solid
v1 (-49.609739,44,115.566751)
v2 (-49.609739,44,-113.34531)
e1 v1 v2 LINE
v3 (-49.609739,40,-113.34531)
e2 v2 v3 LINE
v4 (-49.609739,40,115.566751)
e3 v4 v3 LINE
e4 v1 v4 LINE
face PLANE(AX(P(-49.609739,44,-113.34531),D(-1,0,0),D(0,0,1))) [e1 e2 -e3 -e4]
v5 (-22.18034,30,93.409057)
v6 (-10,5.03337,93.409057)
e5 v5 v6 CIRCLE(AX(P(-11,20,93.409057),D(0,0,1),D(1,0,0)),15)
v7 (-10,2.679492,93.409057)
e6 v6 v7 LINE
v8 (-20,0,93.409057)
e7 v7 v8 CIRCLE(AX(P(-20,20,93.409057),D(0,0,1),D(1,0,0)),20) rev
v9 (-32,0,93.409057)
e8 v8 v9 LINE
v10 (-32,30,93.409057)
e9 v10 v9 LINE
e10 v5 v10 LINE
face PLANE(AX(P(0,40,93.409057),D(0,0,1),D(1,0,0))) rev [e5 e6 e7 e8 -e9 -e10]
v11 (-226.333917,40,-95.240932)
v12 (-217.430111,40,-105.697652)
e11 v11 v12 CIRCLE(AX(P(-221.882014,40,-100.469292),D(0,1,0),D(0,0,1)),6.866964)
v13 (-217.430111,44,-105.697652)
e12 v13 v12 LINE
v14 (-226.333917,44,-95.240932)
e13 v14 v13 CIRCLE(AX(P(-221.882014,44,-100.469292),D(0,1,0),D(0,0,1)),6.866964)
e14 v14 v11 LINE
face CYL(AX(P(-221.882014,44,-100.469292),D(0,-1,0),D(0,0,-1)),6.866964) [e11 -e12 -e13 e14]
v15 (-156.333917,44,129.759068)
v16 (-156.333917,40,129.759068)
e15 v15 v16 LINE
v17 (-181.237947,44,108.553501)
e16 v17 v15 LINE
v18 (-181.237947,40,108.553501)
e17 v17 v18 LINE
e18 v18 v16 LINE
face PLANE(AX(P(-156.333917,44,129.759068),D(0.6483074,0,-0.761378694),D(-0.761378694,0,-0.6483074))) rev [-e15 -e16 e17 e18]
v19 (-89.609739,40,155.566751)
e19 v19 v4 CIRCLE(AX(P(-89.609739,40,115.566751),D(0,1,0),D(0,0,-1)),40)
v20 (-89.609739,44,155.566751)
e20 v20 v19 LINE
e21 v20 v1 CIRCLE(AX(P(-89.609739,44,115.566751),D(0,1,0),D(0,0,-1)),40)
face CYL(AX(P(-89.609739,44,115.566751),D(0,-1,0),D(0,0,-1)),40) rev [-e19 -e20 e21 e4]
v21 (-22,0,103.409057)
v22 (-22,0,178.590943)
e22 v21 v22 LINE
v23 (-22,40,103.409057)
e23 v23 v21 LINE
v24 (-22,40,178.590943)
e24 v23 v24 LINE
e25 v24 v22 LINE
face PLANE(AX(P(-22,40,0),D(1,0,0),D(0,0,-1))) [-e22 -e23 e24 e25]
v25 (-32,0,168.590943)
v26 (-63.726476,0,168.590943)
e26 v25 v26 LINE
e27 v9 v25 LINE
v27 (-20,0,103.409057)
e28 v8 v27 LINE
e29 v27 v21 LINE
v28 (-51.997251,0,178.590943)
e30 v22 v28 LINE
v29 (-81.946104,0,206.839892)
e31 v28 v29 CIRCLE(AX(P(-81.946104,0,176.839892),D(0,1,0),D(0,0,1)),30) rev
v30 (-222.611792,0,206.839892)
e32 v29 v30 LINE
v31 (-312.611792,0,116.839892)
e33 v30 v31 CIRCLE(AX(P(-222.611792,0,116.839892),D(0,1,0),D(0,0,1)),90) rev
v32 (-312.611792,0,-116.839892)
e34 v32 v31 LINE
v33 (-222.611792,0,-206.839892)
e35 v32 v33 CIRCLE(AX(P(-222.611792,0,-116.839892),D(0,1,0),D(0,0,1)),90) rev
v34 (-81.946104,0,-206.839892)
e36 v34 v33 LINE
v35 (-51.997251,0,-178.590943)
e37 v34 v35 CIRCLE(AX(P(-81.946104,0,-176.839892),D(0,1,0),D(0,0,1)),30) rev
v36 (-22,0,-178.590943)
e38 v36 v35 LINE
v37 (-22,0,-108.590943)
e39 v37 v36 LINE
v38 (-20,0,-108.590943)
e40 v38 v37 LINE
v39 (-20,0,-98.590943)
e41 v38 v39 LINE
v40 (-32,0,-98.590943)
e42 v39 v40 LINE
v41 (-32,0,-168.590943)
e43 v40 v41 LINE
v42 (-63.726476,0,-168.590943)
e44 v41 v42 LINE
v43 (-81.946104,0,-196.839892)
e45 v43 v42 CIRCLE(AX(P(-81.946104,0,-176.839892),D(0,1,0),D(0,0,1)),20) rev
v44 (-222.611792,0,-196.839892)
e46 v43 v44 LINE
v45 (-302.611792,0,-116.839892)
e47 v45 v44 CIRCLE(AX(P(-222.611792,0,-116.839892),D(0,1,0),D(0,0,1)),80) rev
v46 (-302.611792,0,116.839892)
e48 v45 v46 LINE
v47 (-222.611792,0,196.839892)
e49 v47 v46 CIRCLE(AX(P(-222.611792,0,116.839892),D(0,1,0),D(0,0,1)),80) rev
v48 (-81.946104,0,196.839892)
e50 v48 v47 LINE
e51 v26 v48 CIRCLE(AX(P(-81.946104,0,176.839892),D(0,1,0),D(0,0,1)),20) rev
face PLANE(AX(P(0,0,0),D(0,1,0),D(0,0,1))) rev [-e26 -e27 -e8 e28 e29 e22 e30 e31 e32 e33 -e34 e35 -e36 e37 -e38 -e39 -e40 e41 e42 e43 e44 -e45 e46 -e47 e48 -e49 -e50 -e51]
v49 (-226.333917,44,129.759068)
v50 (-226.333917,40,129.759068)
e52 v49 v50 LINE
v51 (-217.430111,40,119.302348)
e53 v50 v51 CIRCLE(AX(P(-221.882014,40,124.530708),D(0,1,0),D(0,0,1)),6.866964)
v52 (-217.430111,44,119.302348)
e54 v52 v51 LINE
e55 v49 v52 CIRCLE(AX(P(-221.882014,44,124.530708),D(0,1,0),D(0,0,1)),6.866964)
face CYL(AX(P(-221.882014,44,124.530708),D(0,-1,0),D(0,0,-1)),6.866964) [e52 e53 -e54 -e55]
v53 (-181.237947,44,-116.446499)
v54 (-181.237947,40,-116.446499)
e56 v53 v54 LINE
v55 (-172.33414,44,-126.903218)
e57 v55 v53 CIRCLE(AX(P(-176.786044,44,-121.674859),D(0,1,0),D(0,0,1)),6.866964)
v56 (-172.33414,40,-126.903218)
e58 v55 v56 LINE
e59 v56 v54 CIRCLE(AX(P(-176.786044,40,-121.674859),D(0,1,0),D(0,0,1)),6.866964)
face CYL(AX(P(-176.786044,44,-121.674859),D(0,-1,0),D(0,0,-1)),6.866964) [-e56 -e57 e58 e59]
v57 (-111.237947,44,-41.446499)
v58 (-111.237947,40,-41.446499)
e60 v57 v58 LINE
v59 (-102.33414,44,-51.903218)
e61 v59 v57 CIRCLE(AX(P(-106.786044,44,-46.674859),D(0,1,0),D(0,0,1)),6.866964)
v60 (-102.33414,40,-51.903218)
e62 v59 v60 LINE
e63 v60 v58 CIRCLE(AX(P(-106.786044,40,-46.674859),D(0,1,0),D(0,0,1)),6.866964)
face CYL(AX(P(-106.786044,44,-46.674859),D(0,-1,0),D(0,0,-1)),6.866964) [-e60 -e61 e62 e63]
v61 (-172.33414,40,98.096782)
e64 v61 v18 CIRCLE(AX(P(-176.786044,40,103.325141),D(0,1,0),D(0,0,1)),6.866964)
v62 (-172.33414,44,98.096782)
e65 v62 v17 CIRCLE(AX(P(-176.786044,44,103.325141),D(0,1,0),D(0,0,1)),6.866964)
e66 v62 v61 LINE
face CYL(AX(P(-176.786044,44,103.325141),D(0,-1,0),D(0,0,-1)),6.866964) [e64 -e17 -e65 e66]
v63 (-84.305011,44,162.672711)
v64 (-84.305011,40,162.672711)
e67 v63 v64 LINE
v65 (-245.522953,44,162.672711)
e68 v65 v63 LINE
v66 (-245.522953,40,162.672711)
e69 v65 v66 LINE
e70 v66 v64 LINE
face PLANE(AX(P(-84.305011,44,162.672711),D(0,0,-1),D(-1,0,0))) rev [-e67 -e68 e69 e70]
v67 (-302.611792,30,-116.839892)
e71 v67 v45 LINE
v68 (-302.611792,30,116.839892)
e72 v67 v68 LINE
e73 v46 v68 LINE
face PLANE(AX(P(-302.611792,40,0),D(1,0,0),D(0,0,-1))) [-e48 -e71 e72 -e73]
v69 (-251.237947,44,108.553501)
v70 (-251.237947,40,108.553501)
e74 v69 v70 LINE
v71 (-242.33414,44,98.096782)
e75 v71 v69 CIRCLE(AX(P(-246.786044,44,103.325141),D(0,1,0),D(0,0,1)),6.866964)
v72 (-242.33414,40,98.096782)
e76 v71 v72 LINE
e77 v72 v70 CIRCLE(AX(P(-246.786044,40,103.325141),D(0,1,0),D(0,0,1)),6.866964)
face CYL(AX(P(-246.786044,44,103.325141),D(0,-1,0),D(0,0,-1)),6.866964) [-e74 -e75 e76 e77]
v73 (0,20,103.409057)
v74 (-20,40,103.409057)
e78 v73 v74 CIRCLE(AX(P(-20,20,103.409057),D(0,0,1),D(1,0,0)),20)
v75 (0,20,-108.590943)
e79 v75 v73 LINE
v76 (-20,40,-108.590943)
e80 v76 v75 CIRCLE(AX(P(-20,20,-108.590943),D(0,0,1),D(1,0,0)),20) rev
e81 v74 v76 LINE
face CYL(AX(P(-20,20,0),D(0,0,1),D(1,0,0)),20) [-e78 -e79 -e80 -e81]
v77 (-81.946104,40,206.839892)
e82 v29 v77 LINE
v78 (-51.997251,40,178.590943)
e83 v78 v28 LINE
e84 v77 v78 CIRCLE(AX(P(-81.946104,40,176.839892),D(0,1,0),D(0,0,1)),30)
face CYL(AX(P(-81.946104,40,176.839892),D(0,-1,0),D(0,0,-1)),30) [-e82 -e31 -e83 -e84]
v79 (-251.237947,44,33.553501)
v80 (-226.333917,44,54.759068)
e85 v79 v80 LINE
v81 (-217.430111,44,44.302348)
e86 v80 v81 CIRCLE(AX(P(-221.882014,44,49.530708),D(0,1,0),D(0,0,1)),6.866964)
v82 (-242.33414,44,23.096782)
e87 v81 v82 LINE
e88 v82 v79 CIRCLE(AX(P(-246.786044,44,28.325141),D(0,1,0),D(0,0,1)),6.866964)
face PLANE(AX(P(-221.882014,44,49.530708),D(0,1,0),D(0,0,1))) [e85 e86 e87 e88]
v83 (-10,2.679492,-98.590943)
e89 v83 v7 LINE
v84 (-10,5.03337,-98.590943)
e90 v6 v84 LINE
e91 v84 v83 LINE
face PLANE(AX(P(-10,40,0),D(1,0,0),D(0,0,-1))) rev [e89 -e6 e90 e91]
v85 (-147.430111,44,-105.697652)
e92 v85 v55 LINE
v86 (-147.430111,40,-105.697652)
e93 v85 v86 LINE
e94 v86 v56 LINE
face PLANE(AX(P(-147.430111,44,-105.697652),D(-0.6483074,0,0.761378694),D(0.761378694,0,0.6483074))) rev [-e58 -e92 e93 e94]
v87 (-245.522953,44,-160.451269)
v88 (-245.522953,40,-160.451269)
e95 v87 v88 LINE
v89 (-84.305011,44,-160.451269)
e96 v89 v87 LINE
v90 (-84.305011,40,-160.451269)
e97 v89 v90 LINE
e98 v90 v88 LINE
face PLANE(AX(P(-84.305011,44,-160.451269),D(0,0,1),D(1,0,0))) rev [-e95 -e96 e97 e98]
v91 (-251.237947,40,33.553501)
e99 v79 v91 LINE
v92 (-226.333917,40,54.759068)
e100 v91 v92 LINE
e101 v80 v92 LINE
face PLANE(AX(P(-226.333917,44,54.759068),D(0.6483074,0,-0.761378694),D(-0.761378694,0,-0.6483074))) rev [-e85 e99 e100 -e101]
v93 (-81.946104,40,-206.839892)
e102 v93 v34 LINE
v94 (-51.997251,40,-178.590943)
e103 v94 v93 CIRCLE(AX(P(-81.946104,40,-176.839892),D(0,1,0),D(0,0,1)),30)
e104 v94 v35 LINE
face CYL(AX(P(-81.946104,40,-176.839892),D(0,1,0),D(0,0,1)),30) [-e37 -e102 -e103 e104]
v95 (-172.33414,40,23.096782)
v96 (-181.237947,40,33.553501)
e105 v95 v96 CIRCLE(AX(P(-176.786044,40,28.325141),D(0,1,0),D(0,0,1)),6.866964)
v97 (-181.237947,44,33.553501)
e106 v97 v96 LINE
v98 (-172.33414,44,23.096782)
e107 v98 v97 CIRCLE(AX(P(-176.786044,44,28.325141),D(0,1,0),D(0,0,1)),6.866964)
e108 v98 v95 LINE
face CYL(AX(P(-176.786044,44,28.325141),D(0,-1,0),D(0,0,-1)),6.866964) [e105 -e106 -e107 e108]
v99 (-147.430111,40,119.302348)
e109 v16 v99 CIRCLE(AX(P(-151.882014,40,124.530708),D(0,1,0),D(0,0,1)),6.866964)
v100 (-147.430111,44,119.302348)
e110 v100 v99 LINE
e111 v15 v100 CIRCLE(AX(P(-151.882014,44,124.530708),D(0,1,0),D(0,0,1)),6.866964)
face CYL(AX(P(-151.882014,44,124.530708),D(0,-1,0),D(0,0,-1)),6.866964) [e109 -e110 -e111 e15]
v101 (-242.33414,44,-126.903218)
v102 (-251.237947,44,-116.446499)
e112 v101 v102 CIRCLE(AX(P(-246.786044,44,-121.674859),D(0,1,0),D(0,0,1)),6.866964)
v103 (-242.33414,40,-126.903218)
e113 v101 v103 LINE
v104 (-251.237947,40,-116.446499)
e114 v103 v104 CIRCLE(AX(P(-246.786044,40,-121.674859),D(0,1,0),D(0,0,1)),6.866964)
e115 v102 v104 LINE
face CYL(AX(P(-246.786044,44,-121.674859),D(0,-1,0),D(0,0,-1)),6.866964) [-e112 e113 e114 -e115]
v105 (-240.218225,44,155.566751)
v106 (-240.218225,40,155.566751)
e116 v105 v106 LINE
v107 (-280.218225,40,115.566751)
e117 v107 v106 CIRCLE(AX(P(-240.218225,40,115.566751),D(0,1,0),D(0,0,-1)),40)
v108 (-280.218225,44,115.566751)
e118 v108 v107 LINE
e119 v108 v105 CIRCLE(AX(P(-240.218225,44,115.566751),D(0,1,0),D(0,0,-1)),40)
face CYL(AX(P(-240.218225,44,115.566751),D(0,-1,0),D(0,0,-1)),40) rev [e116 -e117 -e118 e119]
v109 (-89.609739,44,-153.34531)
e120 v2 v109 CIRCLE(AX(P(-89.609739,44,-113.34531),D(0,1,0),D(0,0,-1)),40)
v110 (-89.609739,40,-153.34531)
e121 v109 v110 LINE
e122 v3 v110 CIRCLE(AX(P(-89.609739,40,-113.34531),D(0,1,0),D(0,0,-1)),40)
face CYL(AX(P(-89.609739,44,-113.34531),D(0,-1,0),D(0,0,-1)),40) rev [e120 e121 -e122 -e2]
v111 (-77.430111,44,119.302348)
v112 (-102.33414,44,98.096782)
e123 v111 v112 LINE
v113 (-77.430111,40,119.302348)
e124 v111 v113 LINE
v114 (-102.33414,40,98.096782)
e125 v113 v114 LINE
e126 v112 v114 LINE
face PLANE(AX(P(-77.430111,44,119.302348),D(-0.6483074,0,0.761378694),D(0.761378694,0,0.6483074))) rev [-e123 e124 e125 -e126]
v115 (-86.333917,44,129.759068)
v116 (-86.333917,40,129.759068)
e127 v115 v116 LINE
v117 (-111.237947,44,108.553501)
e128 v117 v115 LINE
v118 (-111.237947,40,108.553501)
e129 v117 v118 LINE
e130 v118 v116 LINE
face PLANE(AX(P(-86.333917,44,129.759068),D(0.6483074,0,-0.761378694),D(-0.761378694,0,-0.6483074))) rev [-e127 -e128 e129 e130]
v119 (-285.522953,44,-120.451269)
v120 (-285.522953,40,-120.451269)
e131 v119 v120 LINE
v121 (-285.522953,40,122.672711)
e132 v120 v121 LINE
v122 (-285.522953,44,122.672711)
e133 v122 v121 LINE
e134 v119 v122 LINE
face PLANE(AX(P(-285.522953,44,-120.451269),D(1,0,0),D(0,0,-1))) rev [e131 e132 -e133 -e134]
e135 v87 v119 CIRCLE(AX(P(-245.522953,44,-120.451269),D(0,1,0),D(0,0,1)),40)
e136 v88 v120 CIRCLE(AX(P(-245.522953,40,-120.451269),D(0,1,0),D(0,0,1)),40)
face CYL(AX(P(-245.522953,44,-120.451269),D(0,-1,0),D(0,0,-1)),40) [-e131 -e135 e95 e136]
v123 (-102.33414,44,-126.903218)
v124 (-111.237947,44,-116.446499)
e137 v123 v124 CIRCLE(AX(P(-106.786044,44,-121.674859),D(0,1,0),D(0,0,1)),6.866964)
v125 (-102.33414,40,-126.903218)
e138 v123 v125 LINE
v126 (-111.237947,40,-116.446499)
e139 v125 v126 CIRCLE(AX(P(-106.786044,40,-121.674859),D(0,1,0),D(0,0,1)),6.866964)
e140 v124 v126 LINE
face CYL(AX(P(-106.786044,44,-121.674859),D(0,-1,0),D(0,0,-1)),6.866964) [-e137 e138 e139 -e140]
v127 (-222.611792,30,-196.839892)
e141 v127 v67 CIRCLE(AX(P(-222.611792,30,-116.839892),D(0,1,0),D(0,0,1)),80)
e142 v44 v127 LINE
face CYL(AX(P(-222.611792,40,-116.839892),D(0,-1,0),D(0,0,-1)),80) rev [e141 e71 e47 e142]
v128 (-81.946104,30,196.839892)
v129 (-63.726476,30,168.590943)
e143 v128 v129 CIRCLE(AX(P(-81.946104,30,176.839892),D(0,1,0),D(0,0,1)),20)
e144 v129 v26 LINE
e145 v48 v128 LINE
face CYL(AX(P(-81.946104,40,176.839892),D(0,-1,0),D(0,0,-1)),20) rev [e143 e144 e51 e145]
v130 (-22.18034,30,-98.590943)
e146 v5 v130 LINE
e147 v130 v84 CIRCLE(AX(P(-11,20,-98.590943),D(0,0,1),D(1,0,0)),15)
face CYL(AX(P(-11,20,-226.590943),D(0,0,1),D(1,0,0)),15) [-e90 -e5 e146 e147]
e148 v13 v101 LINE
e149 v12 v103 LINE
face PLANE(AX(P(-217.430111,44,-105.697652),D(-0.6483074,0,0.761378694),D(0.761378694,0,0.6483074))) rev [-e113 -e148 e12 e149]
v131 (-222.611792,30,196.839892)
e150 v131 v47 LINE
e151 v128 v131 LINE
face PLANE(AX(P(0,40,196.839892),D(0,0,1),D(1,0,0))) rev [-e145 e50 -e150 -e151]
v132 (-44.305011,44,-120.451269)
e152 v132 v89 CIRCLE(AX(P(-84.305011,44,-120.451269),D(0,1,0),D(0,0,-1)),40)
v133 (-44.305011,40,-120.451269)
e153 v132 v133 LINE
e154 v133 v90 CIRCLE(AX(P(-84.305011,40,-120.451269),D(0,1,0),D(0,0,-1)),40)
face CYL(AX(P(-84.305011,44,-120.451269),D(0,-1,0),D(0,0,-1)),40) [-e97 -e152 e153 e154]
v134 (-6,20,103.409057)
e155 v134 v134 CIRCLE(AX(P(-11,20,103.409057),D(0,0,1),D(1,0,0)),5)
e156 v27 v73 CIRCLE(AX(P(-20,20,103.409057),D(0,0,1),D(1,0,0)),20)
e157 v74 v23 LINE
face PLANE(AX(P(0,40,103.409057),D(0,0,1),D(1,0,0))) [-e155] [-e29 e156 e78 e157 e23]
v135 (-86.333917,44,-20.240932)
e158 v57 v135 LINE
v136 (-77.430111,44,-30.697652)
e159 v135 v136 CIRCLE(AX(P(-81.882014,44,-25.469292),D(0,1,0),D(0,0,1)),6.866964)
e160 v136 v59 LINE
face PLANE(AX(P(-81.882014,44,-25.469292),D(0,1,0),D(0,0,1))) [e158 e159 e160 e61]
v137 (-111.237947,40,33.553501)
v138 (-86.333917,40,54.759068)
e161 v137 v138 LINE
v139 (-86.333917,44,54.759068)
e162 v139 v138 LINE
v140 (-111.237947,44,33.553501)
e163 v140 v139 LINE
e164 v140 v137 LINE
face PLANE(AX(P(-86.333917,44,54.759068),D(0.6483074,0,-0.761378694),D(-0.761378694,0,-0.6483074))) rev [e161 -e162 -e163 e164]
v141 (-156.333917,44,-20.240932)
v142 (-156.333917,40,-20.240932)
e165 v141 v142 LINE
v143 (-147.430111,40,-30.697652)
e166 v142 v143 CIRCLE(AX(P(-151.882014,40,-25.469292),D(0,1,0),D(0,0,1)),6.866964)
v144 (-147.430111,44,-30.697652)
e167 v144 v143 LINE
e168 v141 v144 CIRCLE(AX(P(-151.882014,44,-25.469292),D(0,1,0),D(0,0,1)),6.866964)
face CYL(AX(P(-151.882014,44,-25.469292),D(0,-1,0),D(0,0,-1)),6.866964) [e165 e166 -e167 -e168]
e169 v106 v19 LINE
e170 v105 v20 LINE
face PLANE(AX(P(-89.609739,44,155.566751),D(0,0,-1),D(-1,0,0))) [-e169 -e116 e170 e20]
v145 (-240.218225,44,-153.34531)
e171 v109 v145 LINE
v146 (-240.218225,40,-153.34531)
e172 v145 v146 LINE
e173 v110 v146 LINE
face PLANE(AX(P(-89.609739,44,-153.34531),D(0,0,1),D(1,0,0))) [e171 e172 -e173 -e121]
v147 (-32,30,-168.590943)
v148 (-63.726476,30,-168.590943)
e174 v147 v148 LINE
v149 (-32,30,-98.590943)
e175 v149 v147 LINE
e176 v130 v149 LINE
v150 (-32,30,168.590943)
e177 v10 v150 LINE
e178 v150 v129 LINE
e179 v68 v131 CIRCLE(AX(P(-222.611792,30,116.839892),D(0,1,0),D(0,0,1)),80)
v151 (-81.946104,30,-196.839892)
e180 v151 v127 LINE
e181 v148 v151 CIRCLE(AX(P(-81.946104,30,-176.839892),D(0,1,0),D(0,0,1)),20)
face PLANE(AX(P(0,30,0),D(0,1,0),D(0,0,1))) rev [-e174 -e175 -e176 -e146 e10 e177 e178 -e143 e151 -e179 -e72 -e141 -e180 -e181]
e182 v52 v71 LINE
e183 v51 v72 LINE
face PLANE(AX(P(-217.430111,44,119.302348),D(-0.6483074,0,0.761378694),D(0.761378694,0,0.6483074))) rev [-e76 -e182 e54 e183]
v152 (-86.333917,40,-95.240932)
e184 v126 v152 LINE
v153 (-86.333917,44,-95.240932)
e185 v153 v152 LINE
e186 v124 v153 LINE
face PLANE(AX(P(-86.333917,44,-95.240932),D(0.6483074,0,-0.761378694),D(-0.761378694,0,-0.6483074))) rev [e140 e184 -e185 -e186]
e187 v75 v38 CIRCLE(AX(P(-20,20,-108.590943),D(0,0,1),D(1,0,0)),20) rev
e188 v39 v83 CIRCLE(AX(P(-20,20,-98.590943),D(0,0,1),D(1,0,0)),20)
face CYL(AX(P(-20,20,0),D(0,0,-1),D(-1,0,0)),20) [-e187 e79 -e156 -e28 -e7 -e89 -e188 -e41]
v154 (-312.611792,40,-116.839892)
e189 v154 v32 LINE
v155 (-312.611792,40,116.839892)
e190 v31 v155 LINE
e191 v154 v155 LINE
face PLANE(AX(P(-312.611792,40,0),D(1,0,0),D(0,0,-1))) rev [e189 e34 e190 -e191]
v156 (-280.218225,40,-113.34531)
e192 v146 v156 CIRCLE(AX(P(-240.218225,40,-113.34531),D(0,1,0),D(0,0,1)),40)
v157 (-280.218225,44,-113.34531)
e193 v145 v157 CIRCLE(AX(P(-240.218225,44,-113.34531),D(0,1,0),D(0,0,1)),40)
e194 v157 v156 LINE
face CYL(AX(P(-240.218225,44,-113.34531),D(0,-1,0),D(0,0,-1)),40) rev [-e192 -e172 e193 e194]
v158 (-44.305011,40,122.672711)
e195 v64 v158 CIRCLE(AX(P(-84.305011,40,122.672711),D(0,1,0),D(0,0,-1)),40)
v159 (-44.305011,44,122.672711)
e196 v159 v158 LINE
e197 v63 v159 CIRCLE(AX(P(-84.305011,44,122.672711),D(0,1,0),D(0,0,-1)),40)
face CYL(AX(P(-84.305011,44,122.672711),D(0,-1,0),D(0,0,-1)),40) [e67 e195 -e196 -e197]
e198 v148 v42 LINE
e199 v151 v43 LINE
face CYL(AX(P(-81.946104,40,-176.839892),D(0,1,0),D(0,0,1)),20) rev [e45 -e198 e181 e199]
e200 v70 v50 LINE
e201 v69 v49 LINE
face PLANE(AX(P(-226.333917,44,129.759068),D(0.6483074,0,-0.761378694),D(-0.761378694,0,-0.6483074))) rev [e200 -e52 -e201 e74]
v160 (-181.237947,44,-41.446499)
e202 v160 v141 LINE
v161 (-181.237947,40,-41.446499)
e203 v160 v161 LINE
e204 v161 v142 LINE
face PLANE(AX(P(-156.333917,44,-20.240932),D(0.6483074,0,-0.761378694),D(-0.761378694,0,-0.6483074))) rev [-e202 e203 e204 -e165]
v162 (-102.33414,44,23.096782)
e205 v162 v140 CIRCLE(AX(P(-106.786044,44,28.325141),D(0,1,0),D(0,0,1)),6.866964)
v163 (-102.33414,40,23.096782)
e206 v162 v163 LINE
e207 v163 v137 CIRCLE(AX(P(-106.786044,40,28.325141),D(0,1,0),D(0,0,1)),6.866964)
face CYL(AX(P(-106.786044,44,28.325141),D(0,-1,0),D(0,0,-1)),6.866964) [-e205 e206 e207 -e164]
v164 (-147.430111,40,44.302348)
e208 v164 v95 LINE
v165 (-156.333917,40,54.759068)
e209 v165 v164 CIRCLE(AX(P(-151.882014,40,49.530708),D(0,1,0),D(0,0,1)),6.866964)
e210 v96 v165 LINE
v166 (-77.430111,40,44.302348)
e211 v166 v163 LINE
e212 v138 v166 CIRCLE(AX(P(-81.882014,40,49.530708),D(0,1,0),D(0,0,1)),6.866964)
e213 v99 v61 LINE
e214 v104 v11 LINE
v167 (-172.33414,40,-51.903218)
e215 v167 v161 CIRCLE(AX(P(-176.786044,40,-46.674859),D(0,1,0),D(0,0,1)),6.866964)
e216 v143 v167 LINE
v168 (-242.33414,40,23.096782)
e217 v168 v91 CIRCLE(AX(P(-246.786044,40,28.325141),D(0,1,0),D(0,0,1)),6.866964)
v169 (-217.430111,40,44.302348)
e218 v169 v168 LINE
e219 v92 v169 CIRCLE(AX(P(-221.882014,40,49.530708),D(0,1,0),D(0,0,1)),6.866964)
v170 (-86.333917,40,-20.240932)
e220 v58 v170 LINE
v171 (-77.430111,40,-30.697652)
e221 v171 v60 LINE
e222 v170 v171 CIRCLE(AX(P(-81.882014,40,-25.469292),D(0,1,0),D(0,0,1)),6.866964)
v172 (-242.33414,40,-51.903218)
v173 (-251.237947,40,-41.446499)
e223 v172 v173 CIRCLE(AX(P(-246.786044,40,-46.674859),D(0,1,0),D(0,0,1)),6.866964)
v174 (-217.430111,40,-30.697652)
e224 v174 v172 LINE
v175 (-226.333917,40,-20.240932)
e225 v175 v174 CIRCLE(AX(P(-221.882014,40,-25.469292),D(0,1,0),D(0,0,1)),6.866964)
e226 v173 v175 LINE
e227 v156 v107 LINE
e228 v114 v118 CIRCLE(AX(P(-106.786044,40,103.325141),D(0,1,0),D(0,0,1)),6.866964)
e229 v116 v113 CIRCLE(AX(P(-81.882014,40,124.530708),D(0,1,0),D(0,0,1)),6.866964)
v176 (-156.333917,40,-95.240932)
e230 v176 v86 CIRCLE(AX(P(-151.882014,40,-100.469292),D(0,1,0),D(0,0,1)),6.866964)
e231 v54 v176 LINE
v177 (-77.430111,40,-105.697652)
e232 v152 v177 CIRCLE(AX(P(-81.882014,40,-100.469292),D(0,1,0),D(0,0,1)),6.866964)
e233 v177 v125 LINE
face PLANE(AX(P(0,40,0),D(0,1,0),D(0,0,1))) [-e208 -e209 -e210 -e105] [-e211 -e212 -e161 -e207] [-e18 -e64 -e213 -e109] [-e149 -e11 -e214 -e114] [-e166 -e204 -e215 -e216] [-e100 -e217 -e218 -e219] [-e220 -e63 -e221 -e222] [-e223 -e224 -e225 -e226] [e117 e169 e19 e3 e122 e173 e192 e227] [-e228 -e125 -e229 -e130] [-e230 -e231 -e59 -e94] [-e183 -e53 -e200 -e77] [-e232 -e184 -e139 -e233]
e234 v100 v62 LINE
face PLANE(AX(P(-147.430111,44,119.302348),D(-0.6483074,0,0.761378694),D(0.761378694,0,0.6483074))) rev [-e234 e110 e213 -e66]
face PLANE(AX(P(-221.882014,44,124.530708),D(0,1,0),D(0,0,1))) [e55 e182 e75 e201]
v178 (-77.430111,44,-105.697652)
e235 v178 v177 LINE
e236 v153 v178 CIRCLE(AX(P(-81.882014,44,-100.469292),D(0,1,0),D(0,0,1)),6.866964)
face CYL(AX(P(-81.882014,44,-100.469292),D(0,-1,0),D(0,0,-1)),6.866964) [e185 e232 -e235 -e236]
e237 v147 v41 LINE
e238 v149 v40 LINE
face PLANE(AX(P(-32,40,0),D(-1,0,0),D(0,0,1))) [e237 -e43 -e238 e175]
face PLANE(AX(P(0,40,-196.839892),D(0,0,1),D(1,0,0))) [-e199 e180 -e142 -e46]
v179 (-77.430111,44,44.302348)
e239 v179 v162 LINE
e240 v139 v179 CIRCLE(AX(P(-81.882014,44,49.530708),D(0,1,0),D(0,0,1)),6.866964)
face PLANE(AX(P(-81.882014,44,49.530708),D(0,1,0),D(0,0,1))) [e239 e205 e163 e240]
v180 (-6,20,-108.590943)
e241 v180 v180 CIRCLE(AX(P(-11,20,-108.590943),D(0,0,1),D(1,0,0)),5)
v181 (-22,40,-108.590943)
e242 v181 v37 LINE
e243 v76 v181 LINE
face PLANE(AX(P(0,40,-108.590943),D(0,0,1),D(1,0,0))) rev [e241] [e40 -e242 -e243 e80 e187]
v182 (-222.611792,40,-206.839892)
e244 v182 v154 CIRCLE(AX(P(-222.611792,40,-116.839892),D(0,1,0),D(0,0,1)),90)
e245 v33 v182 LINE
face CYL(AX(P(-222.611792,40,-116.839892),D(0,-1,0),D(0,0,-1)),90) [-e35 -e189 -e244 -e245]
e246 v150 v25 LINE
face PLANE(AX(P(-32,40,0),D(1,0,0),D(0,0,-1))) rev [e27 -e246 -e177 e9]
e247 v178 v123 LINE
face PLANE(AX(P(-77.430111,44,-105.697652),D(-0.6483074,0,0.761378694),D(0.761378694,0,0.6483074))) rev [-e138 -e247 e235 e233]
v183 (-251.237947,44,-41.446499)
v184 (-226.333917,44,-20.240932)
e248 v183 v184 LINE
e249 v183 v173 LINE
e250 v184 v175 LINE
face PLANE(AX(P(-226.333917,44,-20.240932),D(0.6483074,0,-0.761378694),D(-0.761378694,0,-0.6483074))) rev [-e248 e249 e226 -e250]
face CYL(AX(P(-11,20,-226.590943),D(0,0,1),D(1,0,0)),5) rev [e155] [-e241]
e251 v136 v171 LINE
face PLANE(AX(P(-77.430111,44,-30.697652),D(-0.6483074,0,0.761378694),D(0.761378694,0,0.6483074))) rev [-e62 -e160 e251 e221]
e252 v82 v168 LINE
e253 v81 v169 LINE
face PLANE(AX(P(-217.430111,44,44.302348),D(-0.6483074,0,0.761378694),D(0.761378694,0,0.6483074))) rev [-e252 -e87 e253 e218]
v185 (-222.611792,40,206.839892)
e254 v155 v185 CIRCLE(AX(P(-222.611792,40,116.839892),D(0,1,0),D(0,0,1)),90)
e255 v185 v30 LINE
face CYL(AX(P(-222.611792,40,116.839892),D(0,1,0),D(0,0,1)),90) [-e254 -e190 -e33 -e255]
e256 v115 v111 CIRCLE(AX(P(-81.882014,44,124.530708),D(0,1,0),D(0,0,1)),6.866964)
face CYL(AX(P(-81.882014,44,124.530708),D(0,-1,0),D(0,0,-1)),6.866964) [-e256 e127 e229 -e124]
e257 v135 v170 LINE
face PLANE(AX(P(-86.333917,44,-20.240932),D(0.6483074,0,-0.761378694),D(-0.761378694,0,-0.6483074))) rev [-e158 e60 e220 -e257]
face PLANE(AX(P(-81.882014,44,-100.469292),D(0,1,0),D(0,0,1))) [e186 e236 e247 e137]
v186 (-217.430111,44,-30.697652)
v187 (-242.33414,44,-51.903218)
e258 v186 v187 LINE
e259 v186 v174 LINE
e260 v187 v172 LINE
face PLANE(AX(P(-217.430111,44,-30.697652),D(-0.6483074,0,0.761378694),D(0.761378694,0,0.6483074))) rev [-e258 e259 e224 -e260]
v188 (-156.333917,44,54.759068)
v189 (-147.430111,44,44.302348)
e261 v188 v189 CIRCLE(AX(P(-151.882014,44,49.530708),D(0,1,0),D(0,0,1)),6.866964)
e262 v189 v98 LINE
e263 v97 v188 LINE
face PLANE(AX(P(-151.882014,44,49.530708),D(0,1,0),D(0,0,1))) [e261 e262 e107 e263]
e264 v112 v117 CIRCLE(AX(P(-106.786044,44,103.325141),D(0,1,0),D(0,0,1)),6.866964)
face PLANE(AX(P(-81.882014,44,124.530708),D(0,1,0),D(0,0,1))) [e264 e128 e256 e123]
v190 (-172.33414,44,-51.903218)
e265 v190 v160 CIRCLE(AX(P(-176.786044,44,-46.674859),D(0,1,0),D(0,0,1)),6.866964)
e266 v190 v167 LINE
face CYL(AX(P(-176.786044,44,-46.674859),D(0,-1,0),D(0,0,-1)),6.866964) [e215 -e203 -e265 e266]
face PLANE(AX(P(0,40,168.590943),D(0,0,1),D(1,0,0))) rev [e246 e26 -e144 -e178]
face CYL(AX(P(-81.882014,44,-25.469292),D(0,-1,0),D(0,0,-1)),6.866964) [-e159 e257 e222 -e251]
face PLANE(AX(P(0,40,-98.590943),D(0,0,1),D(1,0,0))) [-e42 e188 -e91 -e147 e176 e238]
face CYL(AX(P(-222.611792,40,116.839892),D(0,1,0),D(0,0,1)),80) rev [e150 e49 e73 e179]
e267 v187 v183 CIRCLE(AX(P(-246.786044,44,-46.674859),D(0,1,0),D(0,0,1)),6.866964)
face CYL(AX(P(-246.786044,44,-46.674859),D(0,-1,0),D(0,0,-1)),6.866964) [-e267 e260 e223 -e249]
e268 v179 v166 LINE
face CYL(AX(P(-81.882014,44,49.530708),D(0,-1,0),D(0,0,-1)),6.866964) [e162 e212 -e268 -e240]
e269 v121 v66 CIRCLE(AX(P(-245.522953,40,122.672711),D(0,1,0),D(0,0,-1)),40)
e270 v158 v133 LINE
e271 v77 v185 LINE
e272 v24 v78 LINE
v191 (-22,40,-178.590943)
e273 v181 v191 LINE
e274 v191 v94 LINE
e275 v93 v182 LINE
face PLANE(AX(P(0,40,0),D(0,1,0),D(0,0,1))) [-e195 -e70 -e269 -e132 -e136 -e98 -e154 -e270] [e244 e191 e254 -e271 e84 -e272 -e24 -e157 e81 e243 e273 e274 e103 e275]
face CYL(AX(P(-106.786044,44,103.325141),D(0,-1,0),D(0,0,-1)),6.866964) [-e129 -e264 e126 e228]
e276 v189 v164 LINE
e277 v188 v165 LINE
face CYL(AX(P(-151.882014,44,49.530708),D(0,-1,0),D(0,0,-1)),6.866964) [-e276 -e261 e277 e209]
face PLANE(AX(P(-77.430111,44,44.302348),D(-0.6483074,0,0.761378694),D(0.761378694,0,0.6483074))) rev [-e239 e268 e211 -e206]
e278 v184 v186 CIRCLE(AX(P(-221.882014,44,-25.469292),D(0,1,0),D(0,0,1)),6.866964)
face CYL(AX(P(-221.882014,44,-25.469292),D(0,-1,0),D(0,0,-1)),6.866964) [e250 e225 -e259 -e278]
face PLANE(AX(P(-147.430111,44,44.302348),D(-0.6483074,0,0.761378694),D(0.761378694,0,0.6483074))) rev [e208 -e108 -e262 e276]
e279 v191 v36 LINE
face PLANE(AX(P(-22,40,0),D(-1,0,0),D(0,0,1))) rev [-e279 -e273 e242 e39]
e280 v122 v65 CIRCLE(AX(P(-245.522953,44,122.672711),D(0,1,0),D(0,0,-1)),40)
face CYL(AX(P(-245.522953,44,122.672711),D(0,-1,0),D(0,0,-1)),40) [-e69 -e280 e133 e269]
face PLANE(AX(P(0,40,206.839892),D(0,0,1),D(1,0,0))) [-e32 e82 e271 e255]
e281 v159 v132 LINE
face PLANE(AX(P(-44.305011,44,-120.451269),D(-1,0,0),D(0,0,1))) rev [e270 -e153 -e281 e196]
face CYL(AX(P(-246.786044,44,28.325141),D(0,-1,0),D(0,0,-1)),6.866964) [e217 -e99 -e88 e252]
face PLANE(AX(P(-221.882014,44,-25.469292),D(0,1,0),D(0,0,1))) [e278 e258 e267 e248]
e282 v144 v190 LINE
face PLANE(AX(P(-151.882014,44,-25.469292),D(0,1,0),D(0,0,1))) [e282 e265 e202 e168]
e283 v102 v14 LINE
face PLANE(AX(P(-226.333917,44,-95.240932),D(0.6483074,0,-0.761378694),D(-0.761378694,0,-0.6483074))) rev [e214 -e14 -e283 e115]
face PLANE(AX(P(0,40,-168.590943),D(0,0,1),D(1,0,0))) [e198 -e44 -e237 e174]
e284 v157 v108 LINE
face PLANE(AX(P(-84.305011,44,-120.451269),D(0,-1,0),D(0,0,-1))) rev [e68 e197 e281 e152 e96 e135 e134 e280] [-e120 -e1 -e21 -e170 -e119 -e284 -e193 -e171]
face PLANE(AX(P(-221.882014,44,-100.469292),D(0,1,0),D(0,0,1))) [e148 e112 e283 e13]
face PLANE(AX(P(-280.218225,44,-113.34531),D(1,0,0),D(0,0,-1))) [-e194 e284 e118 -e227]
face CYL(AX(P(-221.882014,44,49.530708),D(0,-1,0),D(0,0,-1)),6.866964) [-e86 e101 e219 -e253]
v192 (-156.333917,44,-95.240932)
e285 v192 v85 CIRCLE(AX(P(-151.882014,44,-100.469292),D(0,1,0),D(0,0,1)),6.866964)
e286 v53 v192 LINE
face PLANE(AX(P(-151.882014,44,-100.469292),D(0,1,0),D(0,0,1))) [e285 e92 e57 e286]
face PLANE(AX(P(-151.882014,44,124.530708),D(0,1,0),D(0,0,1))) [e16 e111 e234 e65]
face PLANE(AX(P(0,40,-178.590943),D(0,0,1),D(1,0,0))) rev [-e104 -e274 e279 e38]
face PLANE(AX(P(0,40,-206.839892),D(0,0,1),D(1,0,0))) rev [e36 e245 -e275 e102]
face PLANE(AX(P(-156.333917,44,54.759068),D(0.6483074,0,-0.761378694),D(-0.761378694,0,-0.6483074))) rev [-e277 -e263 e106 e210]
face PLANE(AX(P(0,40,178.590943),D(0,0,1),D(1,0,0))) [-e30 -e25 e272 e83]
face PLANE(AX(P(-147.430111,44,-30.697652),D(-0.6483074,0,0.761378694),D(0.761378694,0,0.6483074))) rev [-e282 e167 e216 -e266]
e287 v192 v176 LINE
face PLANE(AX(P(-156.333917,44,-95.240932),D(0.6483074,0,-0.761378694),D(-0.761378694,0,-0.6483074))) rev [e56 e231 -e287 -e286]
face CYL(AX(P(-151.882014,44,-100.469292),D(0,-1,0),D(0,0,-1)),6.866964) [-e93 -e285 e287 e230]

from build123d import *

# Parameters (mm, degrees)
BOSS_EXTRUDE1_DEPTH = 40
SKETCH2_R           = 5
CUT_EXTRUDE1_DEPTH  = 330
FILLET1_R           = 90
FILLET2_R           = 30
SHELL4_DEPTH        = 5.033370453
SHELL4_START        = -116.839892183
SHELL4_2_OUTLINE_W  = 270.611791966
SHELL4_2_OUTLINE_H  = 24.966629547
SHELL4_2_DEPTH      = 233.679784366
SHELL4_START_2      = -98.590943396
SHELL4_3_DEPTH      = 192
SHELL4_4_DEPTH      = 192
SHELL4_START_3      = 5.033370453
SHELL4_5_DEPTH      = 24.966629547
BOSS_EXTRUDE2_DEPTH = 4
BOSS_EXTRUDE3_DEPTH = 4
FILLET4_R           = 20


with BuildPart() as part:
    # Sketch1 → Boss-Extrude1 (new body)
    with BuildSketch(Plane(origin=(0, 0, 0), x_dir=(1, 0, 0), z_dir=(0, 1, 0))):
        Polygon((0, -103.409056604), (0, 108.590943396), (-22, 108.590943396), (-22, 178.590943396), (-51.997250674, 178.590943396), (-51.997250674, 206.839892183), (-312.611791966, 206.839892183), (-312.611791966, -206.839892183), (-51.997250674, -206.839892183), (-51.997250674, -178.590943396), (-22, -178.590943396), (-22, -173.409056604), (-22, -108.590943396), (-22, -103.409056604), align=None)
    extrude(amount=BOSS_EXTRUDE1_DEPTH)

    # Sketch2 → Cut-Extrude1 (cut, symmetric)
    with BuildSketch(Plane.XY.offset(103.409056604)):
        with Locations((-11, 20)):
            Circle(SKETCH2_R)
    extrude(amount=CUT_EXTRUDE1_DEPTH, both=True, mode=Mode.SUBTRACT)

    # Fillet1
    fillet1_edges = [part.edges().sort_by_distance(p)[0] for p in [
        (-312.611791966, 20, 206.839892183),
        (-312.611791966, 20, -206.839892183),
    ]]
    fillet(fillet1_edges, radius=FILLET1_R)

    # Fillet2
    # the kernel refuses this fillet: 30 mm, written as the material it takes off along each edge
    with BuildSketch(Plane(origin=(-51.997250674, -74.872133486, -206.839892183), x_dir=(-1, 0, 0), z_dir=(0, 1, 0))) as fillet2_piece_1:
        with BuildLine():
            CenterArc((29.948853395, 30), FILLET2_R, 183.3461633, 86.6538367)
            Line((0, 28.248948787), (-0.598977068, 28.213927763))
            ThreePointArc((-0.598977068, 28.213927763), (-0.6, 14.124474394), (-0.6, 0))
            Line((-0.6, 0), (0, -0.6))
            Line((0, -0.6), (29.948853395, -0.6))
            Line((29.948853395, -0.6), (29.948853395, 0))
        make_face()
    extrude(amount=189.744266973, mode=Mode.SUBTRACT)
    with BuildSketch(Plane(origin=(-51.997250674, -74.872133486, 206.839892183), x_dir=(-1, 0, 0), z_dir=(0, 1, 0))) as fillet2_piece_2:
        with BuildLine():
            CenterArc((29.948853395, -30), FILLET2_R, 90, 86.6538367)
            Line((0, -28.248948787), (-0.598977068, -28.213927763))
            ThreePointArc((-0.598977068, -28.213927763), (-0.6, -14.124474394), (-0.6, 0))
            Line((-0.6, 0), (0, 0.6))
            Line((0, 0.6), (29.948853395, 0.6))
            Line((29.948853395, 0.6), (29.948853395, 0))
        make_face()
    extrude(amount=189.744266973, mode=Mode.SUBTRACT)

    # Shell4: read off the stored shape, not the designer's step
    # Shell4 outline → Shell4 (cut)
    with BuildSketch(Plane(origin=(0, 0, 0), x_dir=(1, 0, 0), z_dir=(0, 1, 0))):
        with BuildLine():
            ThreePointArc((-302.611791966, -116.839892183), (-279.180334461, -173.408434678), (-222.611791966, -196.839892183))
            Line((-222.611791966, -196.839892183), (-81.946104068, -196.839892183))
            ThreePointArc((-81.946104068, -196.839892183), (-65.138680474, -187.680118755), (-63.726476084, -168.590943396))
            Line((-63.726476084, -168.590943396), (-32, -168.590943396))
            Line((-32, -168.590943396), (-32, -93.409056604))
            Line((-32, -93.409056604), (-10, -93.409056604))
            Line((-10, -93.409056604), (-10, 98.590943396))
            Line((-10, 98.590943396), (-32, 98.590943396))
            Line((-32, 98.590943396), (-32, 168.590943396))
            Line((-32, 168.590943396), (-63.726476084, 168.590943396))
            ThreePointArc((-63.726476084, 168.590943396), (-65.138680474, 187.680118755), (-81.946104068, 196.839892183))
            Line((-81.946104068, 196.839892183), (-222.611791966, 196.839892183))
            ThreePointArc((-222.611791966, 196.839892183), (-279.180334461, 173.408434678), (-302.611791966, 116.839892183))
            Line((-302.611791966, 116.839892183), (-302.611791966, -116.839892183))
        make_face()
    extrude(amount=SHELL4_DEPTH, mode=Mode.SUBTRACT)

    # Shell4 2 outline → Shell4 2 (cut)
    with BuildSketch(Plane.XY.offset(SHELL4_START)):
        with Locations((-167.305895983, 17.516685227)):
            Rectangle(SHELL4_2_OUTLINE_W, SHELL4_2_OUTLINE_H)
    extrude(amount=SHELL4_2_DEPTH, mode=Mode.SUBTRACT)

    # Shell4 3 outline → Shell4 3 (cut)
    with BuildSketch(Plane.XY.offset(SHELL4_START_2)):
        with BuildLine():
            Line((-32, 30), (-32, 5.033370453))
            Line((-32, 5.033370453), (-12.000000001, 5.033370453))
            ThreePointArc((-12.000000001, 5.033370453), (-24.889683858, 14.336371983), (-22.180339887, 30))
            Line((-22.180339887, 30), (-32, 30))
        make_face()
    extrude(amount=SHELL4_3_DEPTH, mode=Mode.SUBTRACT)

    # Shell4 4 outline → Shell4 4 (add)
    with BuildSketch(Plane.XY.offset(SHELL4_START_2)):
        with BuildLine():
            Line((-10, 5.033370453), (-12.000000001, 5.033370453))
            ThreePointArc((-12.000000001, 5.033370453), (-11, 5), (-10, 5.033370453))
        make_face()
    extrude(amount=SHELL4_4_DEPTH)

    # Shell4 5 outline → Shell4 5 (cut)
    with BuildSketch(Plane(origin=(0, 0, 0), x_dir=(1, 0, 0), z_dir=(0, 1, 0)).offset(SHELL4_START_3)):
        with BuildLine():
            ThreePointArc((-302.611791966, -116.839892183), (-279.180334461, -173.408434678), (-222.611791966, -196.839892183))
            Line((-222.611791966, -196.839892183), (-81.946104068, -196.839892183))
            ThreePointArc((-81.946104068, -196.839892183), (-65.138680474, -187.680118755), (-63.726476084, -168.590943396))
            Line((-63.726476084, -168.590943396), (-32, -168.590943396))
            Line((-32, -168.590943396), (-32, -116.839892183))
            Line((-32, -116.839892183), (-302.611791966, -116.839892183))
        make_face()
        with BuildLine():
            Line((-32, 116.839892183), (-32, 168.590943396))
            Line((-32, 168.590943396), (-63.726476084, 168.590943396))
            ThreePointArc((-63.726476084, 168.590943396), (-65.138680474, 187.680118755), (-81.946104068, 196.839892183))
            Line((-81.946104068, 196.839892183), (-222.611791966, 196.839892183))
            ThreePointArc((-222.611791966, 196.839892183), (-279.180334461, 173.408434678), (-302.611791966, 116.839892183))
            Line((-302.611791966, 116.839892183), (-32, 116.839892183))
        make_face()
    extrude(amount=SHELL4_5_DEPTH, mode=Mode.SUBTRACT)

    # Sketch4 → Boss-Extrude2 (add)
    with BuildSketch(Plane(origin=(0, 40, 0), x_dir=(1, 0, 0), z_dir=(0, 1, 0))):
        with BuildLine():
            Line((-84.305010565, 160.451269182), (-245.522953067, 160.451269182))
            ThreePointArc((-245.522953067, 160.451269182), (-273.807224315, 148.73554043), (-285.522953067, 120.451269182))
            Line((-285.522953067, 120.451269182), (-285.522953067, -122.672710688))
            ThreePointArc((-285.522953067, -122.672710688), (-273.807224315, -150.956981935), (-245.522953067, -162.672710688))
            Line((-245.522953067, -162.672710688), (-84.305010565, -162.672710688))
            ThreePointArc((-84.305010565, -162.672710688), (-56.020739318, -150.956981935), (-44.305010565, -122.672710688))
            Line((-44.305010565, -122.672710688), (-44.305010565, 120.451269182))
            ThreePointArc((-44.305010565, 120.451269182), (-56.020739318, 148.73554043), (-84.305010565, 160.451269182))
        make_face()
        with BuildLine():
            Line((-89.609738748, 153.34530988), (-240.218224885, 153.34530988))
            ThreePointArc((-240.218224885, 153.34530988), (-268.502496132, 141.629581127), (-280.218224885, 113.34530988))
            Line((-280.218224885, 113.34530988), (-280.218224885, -115.566751385))
            ThreePointArc((-280.218224885, -115.566751385), (-268.502496132, -143.851022632), (-240.218224885, -155.566751385))
            Line((-240.218224885, -155.566751385), (-89.609738748, -155.566751385))
            ThreePointArc((-89.609738748, -155.566751385), (-61.3254675, -143.851022632), (-49.609738748, -115.566751385))
            Line((-49.609738748, -115.566751385), (-49.609738748, 113.34530988))
            ThreePointArc((-49.609738748, 113.34530988), (-61.3254675, 141.629581127), (-89.609738748, 153.34530988))
        make_face(mode=Mode.SUBTRACT)
    extrude(amount=BOSS_EXTRUDE2_DEPTH)

    # Sketch5 → Boss-Extrude3 (add)
    with BuildSketch(Plane(origin=(0, 40, 0), x_dir=(1, 0, 0), z_dir=(0, 1, 0))):
        with BuildLine():
            Line((-226.333917402, 95.240932065), (-251.237947051, 116.446498802))
            ThreePointArc((-251.237947051, 116.446498802), (-252.014403521, 126.126762005), (-242.334140318, 126.903218475))
            Line((-242.334140318, 126.903218475), (-217.430110669, 105.697651738))
            ThreePointArc((-217.430110669, 105.697651738), (-216.653654199, 96.017388534), (-226.333917402, 95.240932065))
        make_face()
        with BuildLine():
            Line((-156.333917402, 95.240932065), (-181.237947051, 116.446498802))
            ThreePointArc((-181.237947051, 116.446498802), (-182.014403521, 126.126762005), (-172.334140318, 126.903218475))
            Line((-172.334140318, 126.903218475), (-147.430110669, 105.697651738))
            ThreePointArc((-147.430110669, 105.697651738), (-146.653654199, 96.017388534), (-156.333917402, 95.240932065))
        make_face()
        with BuildLine():
            Line((-86.333917402, 95.240932065), (-111.237947051, 116.446498802))
            ThreePointArc((-111.237947051, 116.446498802), (-112.014403521, 126.126762005), (-102.334140318, 126.903218475))
            Line((-102.334140318, 126.903218475), (-77.430110669, 105.697651738))
            ThreePointArc((-77.430110669, 105.697651738), (-76.653654199, 96.017388534), (-86.333917402, 95.240932065))
        make_face()
        with BuildLine():
            Line((-156.333917402, 20.240932065), (-181.237947051, 41.446498802))
            ThreePointArc((-181.237947051, 41.446498802), (-182.014403521, 51.126762005), (-172.334140318, 51.903218475))
            Line((-172.334140318, 51.903218475), (-147.430110669, 30.697651738))
            ThreePointArc((-147.430110669, 30.697651738), (-146.653654199, 21.017388534), (-156.333917402, 20.240932065))
        make_face()
        with BuildLine():
            Line((-86.333917402, 20.240932065), (-111.237947051, 41.446498802))
            ThreePointArc((-111.237947051, 41.446498802), (-112.014403521, 51.126762005), (-102.334140318, 51.903218475))
            Line((-102.334140318, 51.903218475), (-77.430110669, 30.697651738))
            ThreePointArc((-77.430110669, 30.697651738), (-76.653654199, 21.017388534), (-86.333917402, 20.240932065))
        make_face()
        with BuildLine():
            Line((-156.333917402, -54.759067935), (-181.237947051, -33.553501198))
            ThreePointArc((-181.237947051, -33.553501198), (-182.014403521, -23.873237995), (-172.334140318, -23.096781525))
            Line((-172.334140318, -23.096781525), (-147.430110669, -44.302348262))
            ThreePointArc((-147.430110669, -44.302348262), (-146.653654199, -53.982611466), (-156.333917402, -54.759067935))
        make_face()
        with BuildLine():
            Line((-86.333917402, -54.759067935), (-111.237947051, -33.553501198))
            ThreePointArc((-111.237947051, -33.553501198), (-112.014403521, -23.873237995), (-102.334140318, -23.096781525))
            Line((-102.334140318, -23.096781525), (-77.430110669, -44.302348262))
            ThreePointArc((-77.430110669, -44.302348262), (-76.653654199, -53.982611466), (-86.333917402, -54.759067935))
        make_face()
        with BuildLine():
            Line((-156.333917402, -129.759067935), (-181.237947051, -108.553501198))
            ThreePointArc((-181.237947051, -108.553501198), (-182.014403521, -98.873237995), (-172.334140318, -98.096781525))
            Line((-172.334140318, -98.096781525), (-147.430110669, -119.302348262))
            ThreePointArc((-147.430110669, -119.302348262), (-146.653654199, -128.982611466), (-156.333917402, -129.759067935))
        make_face()
        with BuildLine():
            Line((-86.333917402, -129.759067935), (-111.237947051, -108.553501198))
            ThreePointArc((-111.237947051, -108.553501198), (-112.014403521, -98.873237995), (-102.334140318, -98.096781525))
            Line((-102.334140318, -98.096781525), (-77.430110669, -119.302348262))
            ThreePointArc((-77.430110669, -119.302348262), (-76.653654199, -128.982611466), (-86.333917402, -129.759067935))
        make_face()
        with BuildLine():
            Line((-226.333917402, 20.240932065), (-251.237947051, 41.446498802))
            ThreePointArc((-251.237947051, 41.446498802), (-252.014403521, 51.126762005), (-242.334140318, 51.903218475))
            Line((-242.334140318, 51.903218475), (-217.430110669, 30.697651738))
            ThreePointArc((-217.430110669, 30.697651738), (-216.653654199, 21.017388534), (-226.333917402, 20.240932065))
        make_face()
        with BuildLine():
            Line((-226.333917402, -54.759067935), (-251.237947051, -33.553501198))
            ThreePointArc((-251.237947051, -33.553501198), (-252.014403521, -23.873237995), (-242.334140318, -23.096781525))
            Line((-242.334140318, -23.096781525), (-217.430110669, -44.302348262))
            ThreePointArc((-217.430110669, -44.302348262), (-216.653654199, -53.982611466), (-226.333917402, -54.759067935))
        make_face()
        with BuildLine():
            Line((-226.333917402, -129.759067935), (-251.237947051, -108.553501198))
            ThreePointArc((-251.237947051, -108.553501198), (-252.014403521, -98.873237995), (-242.334140318, -98.096781525))
            Line((-242.334140318, -98.096781525), (-217.430110669, -119.302348262))
            ThreePointArc((-217.430110669, -119.302348262), (-216.653654199, -128.982611466), (-226.333917402, -129.759067935))
        make_face()
    extrude(amount=BOSS_EXTRUDE3_DEPTH)

    # Fillet4
    # the kernel refuses this fillet: 20 mm, written as the material it takes off along each edge
    with BuildSketch(Plane(origin=(0, 0, 153.409056604), x_dir=(-1, 0, 0), z_dir=(0, 0, -1)), Plane(origin=(0, 40, 153.409056604), x_dir=(0, -1, 0), z_dir=(0, 0, -1))) as fillet4_piece_1:
        with BuildLine():
            CenterArc((FILLET4_R, FILLET4_R), FILLET4_R, 180, 90)
            Line((0, FILLET4_R), (0, 0))
            Line((0, 0), (FILLET4_R, 0))
        make_face()
    extrude(amount=312, mode=Mode.SUBTRACT)


solid = part.part
